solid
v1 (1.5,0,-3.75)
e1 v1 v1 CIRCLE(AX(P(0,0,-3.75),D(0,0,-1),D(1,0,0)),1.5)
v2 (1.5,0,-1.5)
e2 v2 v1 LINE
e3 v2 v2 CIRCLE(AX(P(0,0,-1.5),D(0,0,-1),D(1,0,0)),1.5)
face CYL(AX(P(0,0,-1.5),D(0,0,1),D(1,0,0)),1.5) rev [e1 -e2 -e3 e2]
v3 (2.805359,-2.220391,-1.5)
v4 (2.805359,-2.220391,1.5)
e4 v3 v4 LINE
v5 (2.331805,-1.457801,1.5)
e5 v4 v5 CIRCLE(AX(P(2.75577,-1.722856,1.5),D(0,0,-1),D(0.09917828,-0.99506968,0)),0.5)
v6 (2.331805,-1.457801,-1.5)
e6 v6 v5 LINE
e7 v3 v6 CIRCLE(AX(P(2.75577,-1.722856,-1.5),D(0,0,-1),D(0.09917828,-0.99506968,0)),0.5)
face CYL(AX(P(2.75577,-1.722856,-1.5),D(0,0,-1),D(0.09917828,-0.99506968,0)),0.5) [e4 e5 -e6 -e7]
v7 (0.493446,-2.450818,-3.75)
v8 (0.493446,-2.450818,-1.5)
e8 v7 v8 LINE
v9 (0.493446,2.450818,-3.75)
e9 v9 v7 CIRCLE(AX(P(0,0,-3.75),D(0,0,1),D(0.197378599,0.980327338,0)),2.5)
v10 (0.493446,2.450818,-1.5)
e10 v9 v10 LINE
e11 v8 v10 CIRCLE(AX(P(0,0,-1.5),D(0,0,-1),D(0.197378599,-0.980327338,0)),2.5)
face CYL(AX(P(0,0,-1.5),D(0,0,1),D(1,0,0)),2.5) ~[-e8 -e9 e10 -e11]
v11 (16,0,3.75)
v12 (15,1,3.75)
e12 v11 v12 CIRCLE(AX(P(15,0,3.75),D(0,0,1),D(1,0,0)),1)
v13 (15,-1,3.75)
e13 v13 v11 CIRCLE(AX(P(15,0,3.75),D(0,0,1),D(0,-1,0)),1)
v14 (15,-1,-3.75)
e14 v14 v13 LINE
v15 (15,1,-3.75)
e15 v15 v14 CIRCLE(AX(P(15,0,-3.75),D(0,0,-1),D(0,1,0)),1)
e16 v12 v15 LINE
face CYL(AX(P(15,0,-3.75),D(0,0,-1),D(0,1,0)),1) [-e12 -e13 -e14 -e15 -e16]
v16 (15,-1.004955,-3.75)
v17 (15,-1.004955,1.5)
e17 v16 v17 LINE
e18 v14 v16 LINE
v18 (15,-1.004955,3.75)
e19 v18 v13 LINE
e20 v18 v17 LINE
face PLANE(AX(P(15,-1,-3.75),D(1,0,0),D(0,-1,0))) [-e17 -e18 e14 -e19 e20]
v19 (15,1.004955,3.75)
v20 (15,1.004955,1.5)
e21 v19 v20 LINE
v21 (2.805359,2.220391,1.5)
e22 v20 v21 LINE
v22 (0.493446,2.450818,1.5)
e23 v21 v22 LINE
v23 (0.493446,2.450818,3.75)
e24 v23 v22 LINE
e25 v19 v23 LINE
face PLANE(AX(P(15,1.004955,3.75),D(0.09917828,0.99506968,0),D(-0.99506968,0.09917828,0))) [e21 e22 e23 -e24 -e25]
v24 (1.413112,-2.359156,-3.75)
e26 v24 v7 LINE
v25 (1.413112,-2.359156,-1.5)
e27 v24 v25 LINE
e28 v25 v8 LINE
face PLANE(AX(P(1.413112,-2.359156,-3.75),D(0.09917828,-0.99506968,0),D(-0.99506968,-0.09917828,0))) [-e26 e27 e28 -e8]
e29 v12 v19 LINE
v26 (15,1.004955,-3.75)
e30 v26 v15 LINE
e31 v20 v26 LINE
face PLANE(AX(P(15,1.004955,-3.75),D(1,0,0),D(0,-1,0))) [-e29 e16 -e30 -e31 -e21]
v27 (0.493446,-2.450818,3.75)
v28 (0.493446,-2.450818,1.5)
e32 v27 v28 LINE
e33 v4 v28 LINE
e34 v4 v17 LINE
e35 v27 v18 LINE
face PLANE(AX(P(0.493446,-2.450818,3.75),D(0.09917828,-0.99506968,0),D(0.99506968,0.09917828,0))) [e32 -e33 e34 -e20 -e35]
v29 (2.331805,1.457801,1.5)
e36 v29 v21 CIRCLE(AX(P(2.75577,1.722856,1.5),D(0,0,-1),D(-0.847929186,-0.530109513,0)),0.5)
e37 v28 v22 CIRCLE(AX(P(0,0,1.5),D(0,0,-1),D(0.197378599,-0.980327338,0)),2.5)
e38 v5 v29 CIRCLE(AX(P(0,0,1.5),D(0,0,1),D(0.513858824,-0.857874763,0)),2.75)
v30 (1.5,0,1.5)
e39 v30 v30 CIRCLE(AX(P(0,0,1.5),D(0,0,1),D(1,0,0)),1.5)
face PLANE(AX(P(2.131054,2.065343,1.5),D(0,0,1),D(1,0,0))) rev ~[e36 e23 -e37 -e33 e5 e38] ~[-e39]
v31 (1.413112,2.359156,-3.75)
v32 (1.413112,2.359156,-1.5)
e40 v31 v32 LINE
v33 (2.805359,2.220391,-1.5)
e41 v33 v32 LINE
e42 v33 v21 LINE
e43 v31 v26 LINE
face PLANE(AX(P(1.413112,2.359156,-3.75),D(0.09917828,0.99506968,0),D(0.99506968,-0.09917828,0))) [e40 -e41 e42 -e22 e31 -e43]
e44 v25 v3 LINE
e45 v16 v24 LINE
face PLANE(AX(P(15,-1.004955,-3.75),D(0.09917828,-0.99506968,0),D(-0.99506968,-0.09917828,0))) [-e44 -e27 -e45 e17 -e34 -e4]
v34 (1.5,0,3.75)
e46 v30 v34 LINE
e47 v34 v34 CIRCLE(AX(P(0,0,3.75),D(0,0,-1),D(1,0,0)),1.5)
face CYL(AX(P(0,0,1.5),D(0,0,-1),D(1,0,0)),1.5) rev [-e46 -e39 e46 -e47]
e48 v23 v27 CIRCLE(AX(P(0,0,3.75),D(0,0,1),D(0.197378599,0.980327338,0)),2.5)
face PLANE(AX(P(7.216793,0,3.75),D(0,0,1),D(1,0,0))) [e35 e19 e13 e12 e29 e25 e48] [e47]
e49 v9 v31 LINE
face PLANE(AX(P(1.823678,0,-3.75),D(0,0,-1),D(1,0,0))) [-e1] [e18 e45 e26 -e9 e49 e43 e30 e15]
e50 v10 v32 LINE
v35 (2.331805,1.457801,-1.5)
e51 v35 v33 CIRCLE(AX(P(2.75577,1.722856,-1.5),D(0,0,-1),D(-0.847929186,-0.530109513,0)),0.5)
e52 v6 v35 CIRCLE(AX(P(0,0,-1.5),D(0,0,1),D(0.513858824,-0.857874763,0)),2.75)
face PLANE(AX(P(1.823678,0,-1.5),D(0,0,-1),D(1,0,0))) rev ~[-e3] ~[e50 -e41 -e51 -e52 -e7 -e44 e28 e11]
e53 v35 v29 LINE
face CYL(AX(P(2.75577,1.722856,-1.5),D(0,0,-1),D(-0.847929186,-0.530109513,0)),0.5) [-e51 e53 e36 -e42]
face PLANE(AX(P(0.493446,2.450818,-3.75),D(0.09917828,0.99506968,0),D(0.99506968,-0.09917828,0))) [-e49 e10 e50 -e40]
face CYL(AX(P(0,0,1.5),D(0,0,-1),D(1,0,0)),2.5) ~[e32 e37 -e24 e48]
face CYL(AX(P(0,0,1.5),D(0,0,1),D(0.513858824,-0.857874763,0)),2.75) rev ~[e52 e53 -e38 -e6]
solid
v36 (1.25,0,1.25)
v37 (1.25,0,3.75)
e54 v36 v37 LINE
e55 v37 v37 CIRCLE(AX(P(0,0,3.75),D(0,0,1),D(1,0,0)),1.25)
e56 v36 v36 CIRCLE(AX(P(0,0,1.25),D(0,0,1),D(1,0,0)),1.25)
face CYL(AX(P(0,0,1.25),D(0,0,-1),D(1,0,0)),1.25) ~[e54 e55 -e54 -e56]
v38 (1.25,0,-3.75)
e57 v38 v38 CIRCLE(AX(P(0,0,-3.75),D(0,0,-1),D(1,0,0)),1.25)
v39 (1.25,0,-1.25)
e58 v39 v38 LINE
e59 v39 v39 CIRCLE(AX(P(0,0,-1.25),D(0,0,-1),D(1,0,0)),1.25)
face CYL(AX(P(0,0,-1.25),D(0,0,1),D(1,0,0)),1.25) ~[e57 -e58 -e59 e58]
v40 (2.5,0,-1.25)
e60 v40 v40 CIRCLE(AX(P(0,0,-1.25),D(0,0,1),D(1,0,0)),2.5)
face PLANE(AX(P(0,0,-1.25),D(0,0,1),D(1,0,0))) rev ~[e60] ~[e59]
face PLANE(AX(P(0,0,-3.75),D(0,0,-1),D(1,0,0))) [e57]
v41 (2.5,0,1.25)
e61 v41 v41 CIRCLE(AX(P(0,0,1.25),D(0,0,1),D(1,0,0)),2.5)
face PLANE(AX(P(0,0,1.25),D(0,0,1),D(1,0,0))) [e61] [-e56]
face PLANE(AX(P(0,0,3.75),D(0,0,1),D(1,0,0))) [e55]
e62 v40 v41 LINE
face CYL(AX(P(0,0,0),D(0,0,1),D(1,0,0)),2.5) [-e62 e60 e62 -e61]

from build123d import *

# Parameters (mm, degrees)
F0_R         = 2.5
F1_DEPTH     = 1.25
F2_R         = 1.25
F3_DEPTH     = 2.5
F4_R         = 1.25
F5_DEPTH     = 2.5
F7_R         = 2.5
F7_R_2       = 1.5
F8_DEPTH     = 2.25
F10_R        = 2.5
F10_R_2      = 1.5
F11_DEPTH    = 2.25
F13_DEPTH    = 2.25
F15_DEPTH    = 3
F16_R        = 1.5
F17_DEPTH    = 2.25
F18_T1_DEPTH = 3


# Not quite as in the source:
# - a fillet or chamfer that OpenCascade refuses, or shapes differently, is made with other operations: its cross-section is extruded or revolved along the edge and cut away or added


with BuildPart() as f1:
    # F0 (on Top) → F1 (new body, symmetric)
    with BuildSketch(Plane.XY):
        Circle(F0_R)
    extrude(amount=F1_DEPTH, both=True)

    # F2 (on face) → F3 (join)
    with BuildSketch(Plane.XY.offset(1.25)):
        Circle(F2_R)
    extrude(amount=F3_DEPTH)

    # F4 (on face) → F5 (join)
    with BuildSketch(Plane(origin=(0, 0, -1.25), x_dir=(1, 0, 0), z_dir=(0, 0, -1))):
        Circle(F4_R)
    extrude(amount=F5_DEPTH)


with BuildPart() as f8:
    # F7 (on offset) → F8 (new body)
    with BuildSketch(Plane.XY.offset(1.5)):
        Circle(F7_R)
        Circle(F7_R_2, mode=Mode.SUBTRACT)
    extrude(amount=F8_DEPTH)

    # F12 (on face) → F13 (join, through all)
    with BuildSketch(Plane.XY.offset(3.75)):
        with BuildLine():
            ThreePointArc((15, -1), (14, 0), (15, 1))
            Line((15, 1), (15, 1.0049547481))
            Line((15, 1.0049547481), (0.4934464972, 2.4508183438))
            ThreePointArc((0.4934464972, 2.4508183438), (1.9343753828, 1.5837272109), (2.5, 0))
            ThreePointArc((2.5, 0), (1.9343753828, -1.5837272109), (0.4934464972, -2.4508183438))
            Line((0.4934464972, -2.4508183438), (15, -1.0049547481))
            Line((15, -1.0049547481), (15, -1))
        make_face()
        with BuildLine():
            ThreePointArc((2.5, 0), (1.9343753828, 1.5837272109), (0.4934464972, 2.4508183438))
            Line((0.4934464972, 2.4508183438), (0, 2.5))
            Line((0, 2.5), (0, 1.5))
            ThreePointArc((0, 1.5), (1.0606601718, 1.0606601718), (1.5, 0))
            ThreePointArc((1.5, 0), (1.0606601718, -1.0606601718), (0, -1.5))
            Line((0, -1.5), (0, -2.5))
            Line((0, -2.5), (0.4934464972, -2.4508183438))
            ThreePointArc((0.4934464972, -2.4508183438), (1.9343753828, -1.5837272109), (2.5, 0))
        make_face()
        with BuildLine():
            Line((0, 1.5), (0, 2.5))
            ThreePointArc((0, 2.5), (-2.5, 0), (0, -2.5))
            Line((0, -2.5), (0, -1.5))
            ThreePointArc((0, -1.5), (-1.5, 0), (0, 1.5))
        make_face()
        with BuildLine():
            ThreePointArc((15, -1), (15.7071067812, -0.7071067812), (16, 0))
            ThreePointArc((16, 0), (15.7071067812, 0.7071067812), (15, 1))
            Line((15, 1), (15, -1))
        make_face()
        with BuildLine():
            Line((15, -1), (15, 1))
            ThreePointArc((15, 1), (14, 0), (15, -1))
        make_face()
    extrude(amount=-F13_DEPTH)

    # F14 (on face) → F15 (join, through all)
    with BuildSketch(Plane(origin=(0, 0, 1.5), x_dir=(1, 0, 0), z_dir=(0, 0, -1))):
        with BuildLine():
            Line((15, 1), (15, 1.0049547481))
            Line((15, 1.0049547481), (1.4131117673, 2.3591555975))
            ThreePointArc((1.4131117673, 2.3591555975), (2.75, 0), (1.4131117673, -2.3591555975))
            Line((1.4131117673, -2.3591555975), (15, -1.0049547481))
            Line((15, -1.0049547481), (15, -1))
            ThreePointArc((15, -1), (16, 0), (15, 1))
        make_face()
    extrude(amount=F15_DEPTH)



with BuildPart() as f11:
    # F10 (on offset) → F11 (new body)
    with BuildSketch(Plane(origin=(0, 0, -1.5), x_dir=(1, 0, 0), z_dir=(0, 0, -1))):
        Circle(F10_R)
        Circle(F10_R_2, mode=Mode.SUBTRACT)
    extrude(amount=F11_DEPTH)


with BuildPart() as f8_1:
    add(f8.part)

    add(f11.part)  # F17 merges F11
    # F16 (on face) → F17 (join, through all)
    with BuildSketch(Plane(origin=(0, 0, -3.75), x_dir=(1, 0, 0), z_dir=(0, 0, -1))):
        with BuildLine():
            Line((0.4934464972, -2.4508183438), (1.4131117673, -2.3591555975))
            ThreePointArc((1.4131117673, -2.3591555975), (2.75, 0), (1.4131117673, 2.3591555975))
            Line((1.4131117673, 2.3591555975), (0.4934464972, 2.4508183438))
            ThreePointArc((0.4934464972, 2.4508183438), (1.9343753828, 1.5837272109), (2.5, 0))
            ThreePointArc((2.5, 0), (1.9343753828, -1.5837272109), (0.4934464972, -2.4508183438))
        make_face()
        with BuildLine():
            Line((0, -2.5), (0.4934464972, -2.4508183438))
            ThreePointArc((0.4934464972, -2.4508183438), (1.9343753828, -1.5837272109), (2.5, 0))
            ThreePointArc((2.5, 0), (1.9343753828, 1.5837272109), (0.4934464972, 2.4508183438))
            Line((0.4934464972, 2.4508183438), (0, 2.5))
            ThreePointArc((0, 2.5), (-2.5, 0), (0, -2.5))
        make_face()
        Circle(F16_R, mode=Mode.SUBTRACT)
        with BuildLine():
            Line((15, -1.0049547481), (15, -1))
            ThreePointArc((15, -1), (16, 0), (15, 1))
            Line((15, 1), (15, 1.0049547481))
            Line((15, 1.0049547481), (1.4131117673, 2.3591555975))
            ThreePointArc((1.4131117673, 2.3591555975), (2.75, 0), (1.4131117673, -2.3591555975))
            Line((1.4131117673, -2.3591555975), (15, -1.0049547481))
        make_face()
    extrude(amount=-F17_DEPTH)

    # F18: fillet of radius 0.5 on 2 edges, made by hand

    # F18_s2 → F18_t1 (cut)
    with BuildSketch(Plane.XY.offset(-1.5)):
        with BuildLine():
            ThreePointArc((2.3318052613, 1.4578011604), (2.331005251, 1.986626711), (2.8053589943, 2.2203907571))
            Line((2.8053589943, 2.2203907571), (1.4131117673, 2.3591555975))
            ThreePointArc((1.4131117673, 2.3591555975), (1.9259311626, 1.9629796629), (2.3318052613, 1.4578011604))
        make_face()
        with BuildLine():
            ThreePointArc((2.8053589943, -2.2203907571), (2.331005251, -1.986626711), (2.3318052613, -1.4578011604))
            ThreePointArc((2.3318052613, -1.4578011604), (1.9259311626, -1.9629796629), (1.4131117673, -2.3591555975))
            Line((1.4131117673, -2.3591555975), (2.8053589943, -2.2203907571))
        make_face()
    extrude(amount=F18_T1_DEPTH, mode=Mode.SUBTRACT)


solid = Compound([f1.part, f8_1.part])
